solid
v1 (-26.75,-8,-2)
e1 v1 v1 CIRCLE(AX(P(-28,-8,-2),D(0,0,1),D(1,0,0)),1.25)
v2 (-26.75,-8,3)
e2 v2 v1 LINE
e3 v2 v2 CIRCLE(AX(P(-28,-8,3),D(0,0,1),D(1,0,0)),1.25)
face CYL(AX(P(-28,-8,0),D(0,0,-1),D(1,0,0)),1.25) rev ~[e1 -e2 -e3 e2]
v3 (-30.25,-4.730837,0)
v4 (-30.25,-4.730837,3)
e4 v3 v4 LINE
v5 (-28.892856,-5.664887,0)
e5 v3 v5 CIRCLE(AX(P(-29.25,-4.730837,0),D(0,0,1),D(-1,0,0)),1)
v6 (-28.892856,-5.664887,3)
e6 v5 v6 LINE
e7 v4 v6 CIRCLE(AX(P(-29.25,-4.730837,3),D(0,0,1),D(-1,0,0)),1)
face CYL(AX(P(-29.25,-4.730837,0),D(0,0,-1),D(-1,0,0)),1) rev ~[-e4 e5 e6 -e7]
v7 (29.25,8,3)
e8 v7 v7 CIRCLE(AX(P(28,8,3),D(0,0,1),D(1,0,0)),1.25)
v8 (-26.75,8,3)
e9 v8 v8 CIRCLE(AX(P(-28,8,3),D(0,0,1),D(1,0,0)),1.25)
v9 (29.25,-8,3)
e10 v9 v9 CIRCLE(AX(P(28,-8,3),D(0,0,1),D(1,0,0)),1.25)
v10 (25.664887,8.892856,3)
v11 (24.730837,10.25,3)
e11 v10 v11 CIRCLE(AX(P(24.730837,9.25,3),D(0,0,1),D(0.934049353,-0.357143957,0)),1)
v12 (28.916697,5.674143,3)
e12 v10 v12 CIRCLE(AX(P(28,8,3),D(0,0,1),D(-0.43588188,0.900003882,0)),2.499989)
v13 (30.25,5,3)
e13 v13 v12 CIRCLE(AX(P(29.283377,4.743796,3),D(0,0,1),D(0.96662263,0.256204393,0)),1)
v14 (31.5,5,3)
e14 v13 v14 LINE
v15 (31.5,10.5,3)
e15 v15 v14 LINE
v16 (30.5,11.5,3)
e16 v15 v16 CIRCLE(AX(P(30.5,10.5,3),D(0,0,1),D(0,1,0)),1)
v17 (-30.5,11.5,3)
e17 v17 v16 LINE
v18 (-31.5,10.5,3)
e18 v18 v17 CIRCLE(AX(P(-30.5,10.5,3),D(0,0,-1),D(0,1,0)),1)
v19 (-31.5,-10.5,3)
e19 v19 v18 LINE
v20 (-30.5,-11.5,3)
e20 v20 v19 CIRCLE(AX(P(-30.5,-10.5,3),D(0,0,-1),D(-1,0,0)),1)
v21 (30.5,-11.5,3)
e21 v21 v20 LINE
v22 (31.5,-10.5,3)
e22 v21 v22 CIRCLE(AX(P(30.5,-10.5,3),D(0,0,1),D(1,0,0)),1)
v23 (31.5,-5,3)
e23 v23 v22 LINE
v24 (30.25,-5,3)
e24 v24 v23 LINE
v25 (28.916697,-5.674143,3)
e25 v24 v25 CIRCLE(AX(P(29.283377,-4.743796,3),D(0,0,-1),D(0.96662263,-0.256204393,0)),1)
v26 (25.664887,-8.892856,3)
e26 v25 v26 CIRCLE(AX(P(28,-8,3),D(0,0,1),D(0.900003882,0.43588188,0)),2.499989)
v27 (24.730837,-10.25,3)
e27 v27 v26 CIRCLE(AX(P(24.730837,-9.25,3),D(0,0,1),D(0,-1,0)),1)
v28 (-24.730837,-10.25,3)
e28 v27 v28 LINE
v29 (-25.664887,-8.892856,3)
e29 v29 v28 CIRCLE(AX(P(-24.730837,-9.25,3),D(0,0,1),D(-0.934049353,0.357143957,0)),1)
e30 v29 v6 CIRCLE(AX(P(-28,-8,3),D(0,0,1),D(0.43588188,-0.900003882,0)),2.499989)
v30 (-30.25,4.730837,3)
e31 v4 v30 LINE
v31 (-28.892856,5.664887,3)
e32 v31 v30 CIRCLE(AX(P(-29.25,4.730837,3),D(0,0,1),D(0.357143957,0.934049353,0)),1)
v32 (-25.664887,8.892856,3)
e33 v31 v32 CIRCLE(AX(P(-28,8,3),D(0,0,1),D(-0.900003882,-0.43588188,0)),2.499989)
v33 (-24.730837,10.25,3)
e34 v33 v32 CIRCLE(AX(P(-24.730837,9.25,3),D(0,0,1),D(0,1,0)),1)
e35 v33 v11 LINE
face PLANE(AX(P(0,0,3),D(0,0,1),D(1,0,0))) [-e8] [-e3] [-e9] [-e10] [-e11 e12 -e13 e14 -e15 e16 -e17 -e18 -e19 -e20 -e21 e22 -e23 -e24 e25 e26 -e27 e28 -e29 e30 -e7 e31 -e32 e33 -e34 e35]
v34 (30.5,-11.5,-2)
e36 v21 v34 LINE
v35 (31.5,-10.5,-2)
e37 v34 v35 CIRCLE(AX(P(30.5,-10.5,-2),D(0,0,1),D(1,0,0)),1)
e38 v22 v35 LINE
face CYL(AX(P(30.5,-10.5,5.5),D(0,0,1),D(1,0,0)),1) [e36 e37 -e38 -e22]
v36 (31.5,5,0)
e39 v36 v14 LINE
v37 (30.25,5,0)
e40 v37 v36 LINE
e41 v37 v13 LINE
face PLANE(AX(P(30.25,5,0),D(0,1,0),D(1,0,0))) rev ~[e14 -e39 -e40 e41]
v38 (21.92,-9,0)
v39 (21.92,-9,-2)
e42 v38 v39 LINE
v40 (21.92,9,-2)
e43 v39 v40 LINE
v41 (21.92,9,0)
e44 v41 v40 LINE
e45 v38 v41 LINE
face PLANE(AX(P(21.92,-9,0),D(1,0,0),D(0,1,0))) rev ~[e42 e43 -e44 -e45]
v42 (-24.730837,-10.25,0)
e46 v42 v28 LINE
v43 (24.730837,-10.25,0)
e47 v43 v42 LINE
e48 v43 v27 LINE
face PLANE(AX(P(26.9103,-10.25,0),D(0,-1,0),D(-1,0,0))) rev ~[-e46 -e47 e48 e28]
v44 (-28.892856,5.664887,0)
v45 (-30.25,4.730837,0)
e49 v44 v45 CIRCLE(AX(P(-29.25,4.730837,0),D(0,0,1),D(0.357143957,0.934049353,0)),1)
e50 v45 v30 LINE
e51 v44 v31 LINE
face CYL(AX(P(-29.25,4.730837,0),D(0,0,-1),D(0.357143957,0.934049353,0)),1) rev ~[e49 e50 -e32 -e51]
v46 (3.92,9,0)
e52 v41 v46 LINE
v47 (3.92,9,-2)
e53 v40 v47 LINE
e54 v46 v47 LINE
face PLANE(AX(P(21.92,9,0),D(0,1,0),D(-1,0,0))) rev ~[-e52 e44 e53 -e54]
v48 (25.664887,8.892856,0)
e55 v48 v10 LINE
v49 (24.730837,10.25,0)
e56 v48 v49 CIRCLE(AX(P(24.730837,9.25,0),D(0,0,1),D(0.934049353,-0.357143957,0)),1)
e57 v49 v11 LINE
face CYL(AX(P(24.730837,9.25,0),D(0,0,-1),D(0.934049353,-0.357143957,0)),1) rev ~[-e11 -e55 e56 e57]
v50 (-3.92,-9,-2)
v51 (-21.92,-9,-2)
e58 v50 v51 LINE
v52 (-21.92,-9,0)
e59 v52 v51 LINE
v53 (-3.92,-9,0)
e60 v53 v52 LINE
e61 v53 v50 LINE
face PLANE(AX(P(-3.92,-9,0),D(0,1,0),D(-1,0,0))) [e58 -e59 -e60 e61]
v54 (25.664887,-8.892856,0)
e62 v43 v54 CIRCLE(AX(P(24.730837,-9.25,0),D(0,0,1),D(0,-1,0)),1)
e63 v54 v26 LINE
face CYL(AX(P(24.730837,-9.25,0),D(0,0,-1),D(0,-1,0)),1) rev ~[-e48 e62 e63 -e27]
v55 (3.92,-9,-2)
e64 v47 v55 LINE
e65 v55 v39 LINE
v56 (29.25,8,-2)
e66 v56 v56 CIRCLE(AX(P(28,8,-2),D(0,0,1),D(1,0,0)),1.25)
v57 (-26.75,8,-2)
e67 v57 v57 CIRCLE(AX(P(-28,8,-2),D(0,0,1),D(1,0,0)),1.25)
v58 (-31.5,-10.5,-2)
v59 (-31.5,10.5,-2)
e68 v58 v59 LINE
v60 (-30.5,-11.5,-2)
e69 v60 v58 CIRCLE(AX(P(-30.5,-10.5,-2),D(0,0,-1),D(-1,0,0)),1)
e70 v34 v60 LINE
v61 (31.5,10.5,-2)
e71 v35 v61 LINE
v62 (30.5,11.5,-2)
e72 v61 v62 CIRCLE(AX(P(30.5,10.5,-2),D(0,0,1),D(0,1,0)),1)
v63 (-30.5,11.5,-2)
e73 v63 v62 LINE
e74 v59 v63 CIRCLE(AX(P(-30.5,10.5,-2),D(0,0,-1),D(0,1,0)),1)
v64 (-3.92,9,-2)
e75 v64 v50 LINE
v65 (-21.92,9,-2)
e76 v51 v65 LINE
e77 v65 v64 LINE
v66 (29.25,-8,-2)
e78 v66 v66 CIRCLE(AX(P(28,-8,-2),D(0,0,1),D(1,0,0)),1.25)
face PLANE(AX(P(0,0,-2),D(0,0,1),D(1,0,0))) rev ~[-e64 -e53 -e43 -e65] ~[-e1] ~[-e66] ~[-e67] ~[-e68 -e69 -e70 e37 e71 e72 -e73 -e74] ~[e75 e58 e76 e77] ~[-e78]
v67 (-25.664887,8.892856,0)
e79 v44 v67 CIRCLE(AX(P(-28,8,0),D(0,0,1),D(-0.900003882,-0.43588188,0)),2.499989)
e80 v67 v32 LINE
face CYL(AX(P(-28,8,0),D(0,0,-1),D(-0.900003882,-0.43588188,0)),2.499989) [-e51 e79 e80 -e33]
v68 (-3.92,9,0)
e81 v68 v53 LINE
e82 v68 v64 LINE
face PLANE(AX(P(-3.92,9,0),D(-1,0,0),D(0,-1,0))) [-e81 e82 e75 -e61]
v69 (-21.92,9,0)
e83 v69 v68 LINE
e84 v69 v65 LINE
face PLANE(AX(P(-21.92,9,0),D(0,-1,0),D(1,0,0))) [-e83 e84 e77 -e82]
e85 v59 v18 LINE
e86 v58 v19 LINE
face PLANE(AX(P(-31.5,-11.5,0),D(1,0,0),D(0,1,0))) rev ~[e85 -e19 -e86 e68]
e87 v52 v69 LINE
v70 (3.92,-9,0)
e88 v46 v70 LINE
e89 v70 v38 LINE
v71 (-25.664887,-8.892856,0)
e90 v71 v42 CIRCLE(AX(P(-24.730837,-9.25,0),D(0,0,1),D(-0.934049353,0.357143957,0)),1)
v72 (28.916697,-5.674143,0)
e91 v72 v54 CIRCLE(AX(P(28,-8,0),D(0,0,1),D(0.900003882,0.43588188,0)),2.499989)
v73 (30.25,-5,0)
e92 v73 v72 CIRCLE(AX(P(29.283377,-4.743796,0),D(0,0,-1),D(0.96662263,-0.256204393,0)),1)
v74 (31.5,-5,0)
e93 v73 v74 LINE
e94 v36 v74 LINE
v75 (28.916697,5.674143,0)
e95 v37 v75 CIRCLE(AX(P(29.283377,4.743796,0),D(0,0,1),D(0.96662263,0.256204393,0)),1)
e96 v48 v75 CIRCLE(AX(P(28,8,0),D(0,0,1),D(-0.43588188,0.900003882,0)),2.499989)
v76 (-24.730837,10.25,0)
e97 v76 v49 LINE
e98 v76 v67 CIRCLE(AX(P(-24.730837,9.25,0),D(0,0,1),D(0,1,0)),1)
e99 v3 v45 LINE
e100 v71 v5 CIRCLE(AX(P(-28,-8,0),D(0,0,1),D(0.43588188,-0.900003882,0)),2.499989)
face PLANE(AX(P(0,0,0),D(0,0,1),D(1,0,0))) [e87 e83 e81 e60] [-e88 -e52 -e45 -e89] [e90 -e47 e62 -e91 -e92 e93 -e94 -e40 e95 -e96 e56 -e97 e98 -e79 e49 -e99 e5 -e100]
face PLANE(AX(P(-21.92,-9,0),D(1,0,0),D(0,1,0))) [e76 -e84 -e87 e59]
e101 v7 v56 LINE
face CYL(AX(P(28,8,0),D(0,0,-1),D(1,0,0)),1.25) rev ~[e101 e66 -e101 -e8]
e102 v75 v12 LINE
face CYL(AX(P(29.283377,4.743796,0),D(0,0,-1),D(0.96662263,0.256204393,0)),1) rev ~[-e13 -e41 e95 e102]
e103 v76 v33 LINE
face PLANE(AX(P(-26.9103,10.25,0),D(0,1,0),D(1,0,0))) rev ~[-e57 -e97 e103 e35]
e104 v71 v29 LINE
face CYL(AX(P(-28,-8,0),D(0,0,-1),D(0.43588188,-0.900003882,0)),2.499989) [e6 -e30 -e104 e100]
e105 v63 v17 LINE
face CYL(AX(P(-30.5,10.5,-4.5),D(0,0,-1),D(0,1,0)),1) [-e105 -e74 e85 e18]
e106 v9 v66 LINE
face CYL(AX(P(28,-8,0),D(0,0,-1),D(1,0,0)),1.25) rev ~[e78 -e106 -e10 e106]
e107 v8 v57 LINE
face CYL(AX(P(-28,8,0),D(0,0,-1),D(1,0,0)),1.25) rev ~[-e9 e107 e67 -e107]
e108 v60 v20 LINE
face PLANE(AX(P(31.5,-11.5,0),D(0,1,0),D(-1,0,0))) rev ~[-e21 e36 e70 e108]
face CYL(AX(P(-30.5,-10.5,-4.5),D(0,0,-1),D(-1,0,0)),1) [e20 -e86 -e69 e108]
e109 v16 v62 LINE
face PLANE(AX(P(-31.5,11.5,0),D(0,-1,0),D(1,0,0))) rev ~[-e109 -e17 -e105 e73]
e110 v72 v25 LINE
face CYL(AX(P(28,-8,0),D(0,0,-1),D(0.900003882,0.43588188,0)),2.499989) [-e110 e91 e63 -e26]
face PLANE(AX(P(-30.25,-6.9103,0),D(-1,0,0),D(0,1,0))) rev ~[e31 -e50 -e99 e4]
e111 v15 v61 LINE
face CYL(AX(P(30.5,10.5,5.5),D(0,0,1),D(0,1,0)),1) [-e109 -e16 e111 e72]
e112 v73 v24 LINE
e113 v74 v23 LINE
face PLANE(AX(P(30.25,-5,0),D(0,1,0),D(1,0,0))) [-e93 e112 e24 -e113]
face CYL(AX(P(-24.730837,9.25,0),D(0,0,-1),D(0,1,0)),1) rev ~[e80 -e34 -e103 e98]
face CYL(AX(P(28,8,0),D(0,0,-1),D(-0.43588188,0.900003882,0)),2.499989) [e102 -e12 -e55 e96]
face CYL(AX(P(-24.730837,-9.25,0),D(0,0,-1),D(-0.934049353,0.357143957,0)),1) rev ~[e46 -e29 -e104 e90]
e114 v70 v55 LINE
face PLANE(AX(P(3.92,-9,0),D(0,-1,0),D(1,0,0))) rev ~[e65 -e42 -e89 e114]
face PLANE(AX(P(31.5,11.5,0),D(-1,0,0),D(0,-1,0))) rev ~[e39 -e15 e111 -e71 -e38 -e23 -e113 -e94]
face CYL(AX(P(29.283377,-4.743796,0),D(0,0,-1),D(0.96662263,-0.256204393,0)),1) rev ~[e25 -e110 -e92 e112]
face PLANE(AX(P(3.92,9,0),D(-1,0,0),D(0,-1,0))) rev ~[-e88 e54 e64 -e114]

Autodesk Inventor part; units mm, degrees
ref_plane "YZ Plane" through (0, 0, 0) normal (1, 0, 0) x (0, 1, 0)
ref_plane "XZ Plane" through (0, 0, 0) normal (0, 1, 0) x (-1, 0, 0)
ref_plane "XY Plane" through (0, 0, 0) normal (0, 0, 1) x (1, 0, 0)
sketch "スケッチ1" plane through (0, 0, 0) normal (0, 0, 1) x (1, 0, 0)
  line L0 (-31.5, 11.5) -> (31.5, 11.5)
  line L1 (31.5, 11.5) -> (31.5, -11.5)
  line L2 (31.5, -11.5) -> (-31.5, -11.5)
  line L3 (-31.5, -11.5) -> (-31.5, 11.5)
  line L4 (-31.5, 11.5) -> (31.5, -11.5) construction
  line L5 (31.5, 11.5) -> (-31.5, -11.5) construction
  line L6 (-30, 10) -> (30, 10) construction
  line L7 (30, 10) -> (30, -10) construction
  line L8 (30, -10) -> (-30, -10) construction
  line L9 (-30, -10) -> (-30, 10) construction
  line L10 (-30, 10) -> (30, -10) construction
  line L11 (30, 10) -> (-30, -10) construction
  circle A0 centre (-28, 8) radius 1.25
  line L12 (-31.5, 0) -> (31.5, 0) construction
  line L13 (0, 11.5) -> (0, -11.5) construction
  circle A1 centre (-28, -8) radius 1.25
  circle A2 centre (28, 8) radius 1.25
  circle A3 centre (28, -8) radius 1.25
  line L14 (-30.25, 10.25) -> (30.25, 10.25)
  line L15 (30.25, 10.25) -> (30.25, -10.25)
  line L16 (30.25, -10.25) -> (-30.25, -10.25)
  line L17 (-30.25, -10.25) -> (-30.25, 10.25)
  line L18 (-30.25, 10.25) -> (30.25, -10.25) construction
  line L19 (30.25, 10.25) -> (-30.25, -10.25) construction
  line L20 (-21.92, 9) -> (-3.92, 9)
  line L21 (-3.92, 9) -> (-3.92, -9)
  line L22 (-3.92, -9) -> (-21.92, -9)
  line L23 (-21.92, -9) -> (-21.92, 9)
  line L24 (-21.92, 9) -> (-3.92, -9) construction
  line L25 (-3.92, 9) -> (-21.92, -9) construction
  line L26 (21.92, 9) -> (3.92, 9)
  line L27 (3.92, 9) -> (3.92, -9)
  line L28 (3.92, -9) -> (21.92, -9)
  line L29 (21.92, -9) -> (21.92, 9)
  line L30 (21.92, 9) -> (3.92, -9) construction
  line L31 (3.92, 9) -> (21.92, -9) construction
  arc A4 (-30.25, 6.9103) -> (-26.9103, 10.25) centre (-28, 8) ccw
  arc A5 (-26.9103, -10.25) -> (-30.25, -6.9103) centre (-28, -8) ccw
  arc A6 (26.9103, 10.25) -> (30.25, 6.9103) centre (28, 8) ccw
  arc A7 (30.25, -6.9103) -> (26.9103, -10.25) centre (28, -8) ccw
  line L32 (30.25, 5) -> (31.5, 5)
  line L33 (30.25, -5) -> (31.5, -5)
  point P0 (0, 0)
  point P1 (0, 0)
  point P2 (-12.92, 0)
  point P3 (12.92, 0)
  point P4 (30.25, -6.9103)
  point P5 (26.9103, -10.25)
  point P6 (-30.25, -6.9103)
  point P7 (30.25, 6.9103)
  dimension "d0" = 63
  dimension "d1" = 60
  dimension "d2" = 20
  dimension "d3" = 23
  dimension "d4" = 2.5
  dimension "d5" = 2
  dimension "d6" = 2
  dimension "d7" = 20.5
  dimension "d8" = 60.5
  dimension "d17" = 18
  dimension "d18" = 18
  dimension "d19" = 17.08
  dimension "d22" = 2.5
  dimension "d23" = 10
extrude "押し出し1" add sketch "スケッチ1" against normal blind 2
extrude "押し出し5" add sketch "スケッチ1" along normal blind 3 contours L0 L1 L32 L15 L14 L17 L16 L33 L2 L3 | A6 L14 L15 | L15 L16 A7 | A4 L17 L14 | L16 L17 A5
fillet "フィレット2" radius 1 12 edges at (-31.5, 11.5, 0.5) (-31.5, -11.5, 0.5) (31.5, -11.5, 0.5) (31.5, 11.5, 0.5) (26.9103, 10.25, 1.5) (30.25, 6.9103, 1.5) (30.25, -6.9103, 1.5) (26.9103, -10.25, 1.5) (-26.9103, -10.25, 1.5) (-30.25, -6.9103, 1.5) (-30.25, 6.9103, 1.5) (-26.9103, 10.25, 1.5)
equation "\"d6\" = d5"
equation "\"d17\" = d18"
properties part number "StartStopSwitch_cover_01" material "アセタール樹脂、黒"
